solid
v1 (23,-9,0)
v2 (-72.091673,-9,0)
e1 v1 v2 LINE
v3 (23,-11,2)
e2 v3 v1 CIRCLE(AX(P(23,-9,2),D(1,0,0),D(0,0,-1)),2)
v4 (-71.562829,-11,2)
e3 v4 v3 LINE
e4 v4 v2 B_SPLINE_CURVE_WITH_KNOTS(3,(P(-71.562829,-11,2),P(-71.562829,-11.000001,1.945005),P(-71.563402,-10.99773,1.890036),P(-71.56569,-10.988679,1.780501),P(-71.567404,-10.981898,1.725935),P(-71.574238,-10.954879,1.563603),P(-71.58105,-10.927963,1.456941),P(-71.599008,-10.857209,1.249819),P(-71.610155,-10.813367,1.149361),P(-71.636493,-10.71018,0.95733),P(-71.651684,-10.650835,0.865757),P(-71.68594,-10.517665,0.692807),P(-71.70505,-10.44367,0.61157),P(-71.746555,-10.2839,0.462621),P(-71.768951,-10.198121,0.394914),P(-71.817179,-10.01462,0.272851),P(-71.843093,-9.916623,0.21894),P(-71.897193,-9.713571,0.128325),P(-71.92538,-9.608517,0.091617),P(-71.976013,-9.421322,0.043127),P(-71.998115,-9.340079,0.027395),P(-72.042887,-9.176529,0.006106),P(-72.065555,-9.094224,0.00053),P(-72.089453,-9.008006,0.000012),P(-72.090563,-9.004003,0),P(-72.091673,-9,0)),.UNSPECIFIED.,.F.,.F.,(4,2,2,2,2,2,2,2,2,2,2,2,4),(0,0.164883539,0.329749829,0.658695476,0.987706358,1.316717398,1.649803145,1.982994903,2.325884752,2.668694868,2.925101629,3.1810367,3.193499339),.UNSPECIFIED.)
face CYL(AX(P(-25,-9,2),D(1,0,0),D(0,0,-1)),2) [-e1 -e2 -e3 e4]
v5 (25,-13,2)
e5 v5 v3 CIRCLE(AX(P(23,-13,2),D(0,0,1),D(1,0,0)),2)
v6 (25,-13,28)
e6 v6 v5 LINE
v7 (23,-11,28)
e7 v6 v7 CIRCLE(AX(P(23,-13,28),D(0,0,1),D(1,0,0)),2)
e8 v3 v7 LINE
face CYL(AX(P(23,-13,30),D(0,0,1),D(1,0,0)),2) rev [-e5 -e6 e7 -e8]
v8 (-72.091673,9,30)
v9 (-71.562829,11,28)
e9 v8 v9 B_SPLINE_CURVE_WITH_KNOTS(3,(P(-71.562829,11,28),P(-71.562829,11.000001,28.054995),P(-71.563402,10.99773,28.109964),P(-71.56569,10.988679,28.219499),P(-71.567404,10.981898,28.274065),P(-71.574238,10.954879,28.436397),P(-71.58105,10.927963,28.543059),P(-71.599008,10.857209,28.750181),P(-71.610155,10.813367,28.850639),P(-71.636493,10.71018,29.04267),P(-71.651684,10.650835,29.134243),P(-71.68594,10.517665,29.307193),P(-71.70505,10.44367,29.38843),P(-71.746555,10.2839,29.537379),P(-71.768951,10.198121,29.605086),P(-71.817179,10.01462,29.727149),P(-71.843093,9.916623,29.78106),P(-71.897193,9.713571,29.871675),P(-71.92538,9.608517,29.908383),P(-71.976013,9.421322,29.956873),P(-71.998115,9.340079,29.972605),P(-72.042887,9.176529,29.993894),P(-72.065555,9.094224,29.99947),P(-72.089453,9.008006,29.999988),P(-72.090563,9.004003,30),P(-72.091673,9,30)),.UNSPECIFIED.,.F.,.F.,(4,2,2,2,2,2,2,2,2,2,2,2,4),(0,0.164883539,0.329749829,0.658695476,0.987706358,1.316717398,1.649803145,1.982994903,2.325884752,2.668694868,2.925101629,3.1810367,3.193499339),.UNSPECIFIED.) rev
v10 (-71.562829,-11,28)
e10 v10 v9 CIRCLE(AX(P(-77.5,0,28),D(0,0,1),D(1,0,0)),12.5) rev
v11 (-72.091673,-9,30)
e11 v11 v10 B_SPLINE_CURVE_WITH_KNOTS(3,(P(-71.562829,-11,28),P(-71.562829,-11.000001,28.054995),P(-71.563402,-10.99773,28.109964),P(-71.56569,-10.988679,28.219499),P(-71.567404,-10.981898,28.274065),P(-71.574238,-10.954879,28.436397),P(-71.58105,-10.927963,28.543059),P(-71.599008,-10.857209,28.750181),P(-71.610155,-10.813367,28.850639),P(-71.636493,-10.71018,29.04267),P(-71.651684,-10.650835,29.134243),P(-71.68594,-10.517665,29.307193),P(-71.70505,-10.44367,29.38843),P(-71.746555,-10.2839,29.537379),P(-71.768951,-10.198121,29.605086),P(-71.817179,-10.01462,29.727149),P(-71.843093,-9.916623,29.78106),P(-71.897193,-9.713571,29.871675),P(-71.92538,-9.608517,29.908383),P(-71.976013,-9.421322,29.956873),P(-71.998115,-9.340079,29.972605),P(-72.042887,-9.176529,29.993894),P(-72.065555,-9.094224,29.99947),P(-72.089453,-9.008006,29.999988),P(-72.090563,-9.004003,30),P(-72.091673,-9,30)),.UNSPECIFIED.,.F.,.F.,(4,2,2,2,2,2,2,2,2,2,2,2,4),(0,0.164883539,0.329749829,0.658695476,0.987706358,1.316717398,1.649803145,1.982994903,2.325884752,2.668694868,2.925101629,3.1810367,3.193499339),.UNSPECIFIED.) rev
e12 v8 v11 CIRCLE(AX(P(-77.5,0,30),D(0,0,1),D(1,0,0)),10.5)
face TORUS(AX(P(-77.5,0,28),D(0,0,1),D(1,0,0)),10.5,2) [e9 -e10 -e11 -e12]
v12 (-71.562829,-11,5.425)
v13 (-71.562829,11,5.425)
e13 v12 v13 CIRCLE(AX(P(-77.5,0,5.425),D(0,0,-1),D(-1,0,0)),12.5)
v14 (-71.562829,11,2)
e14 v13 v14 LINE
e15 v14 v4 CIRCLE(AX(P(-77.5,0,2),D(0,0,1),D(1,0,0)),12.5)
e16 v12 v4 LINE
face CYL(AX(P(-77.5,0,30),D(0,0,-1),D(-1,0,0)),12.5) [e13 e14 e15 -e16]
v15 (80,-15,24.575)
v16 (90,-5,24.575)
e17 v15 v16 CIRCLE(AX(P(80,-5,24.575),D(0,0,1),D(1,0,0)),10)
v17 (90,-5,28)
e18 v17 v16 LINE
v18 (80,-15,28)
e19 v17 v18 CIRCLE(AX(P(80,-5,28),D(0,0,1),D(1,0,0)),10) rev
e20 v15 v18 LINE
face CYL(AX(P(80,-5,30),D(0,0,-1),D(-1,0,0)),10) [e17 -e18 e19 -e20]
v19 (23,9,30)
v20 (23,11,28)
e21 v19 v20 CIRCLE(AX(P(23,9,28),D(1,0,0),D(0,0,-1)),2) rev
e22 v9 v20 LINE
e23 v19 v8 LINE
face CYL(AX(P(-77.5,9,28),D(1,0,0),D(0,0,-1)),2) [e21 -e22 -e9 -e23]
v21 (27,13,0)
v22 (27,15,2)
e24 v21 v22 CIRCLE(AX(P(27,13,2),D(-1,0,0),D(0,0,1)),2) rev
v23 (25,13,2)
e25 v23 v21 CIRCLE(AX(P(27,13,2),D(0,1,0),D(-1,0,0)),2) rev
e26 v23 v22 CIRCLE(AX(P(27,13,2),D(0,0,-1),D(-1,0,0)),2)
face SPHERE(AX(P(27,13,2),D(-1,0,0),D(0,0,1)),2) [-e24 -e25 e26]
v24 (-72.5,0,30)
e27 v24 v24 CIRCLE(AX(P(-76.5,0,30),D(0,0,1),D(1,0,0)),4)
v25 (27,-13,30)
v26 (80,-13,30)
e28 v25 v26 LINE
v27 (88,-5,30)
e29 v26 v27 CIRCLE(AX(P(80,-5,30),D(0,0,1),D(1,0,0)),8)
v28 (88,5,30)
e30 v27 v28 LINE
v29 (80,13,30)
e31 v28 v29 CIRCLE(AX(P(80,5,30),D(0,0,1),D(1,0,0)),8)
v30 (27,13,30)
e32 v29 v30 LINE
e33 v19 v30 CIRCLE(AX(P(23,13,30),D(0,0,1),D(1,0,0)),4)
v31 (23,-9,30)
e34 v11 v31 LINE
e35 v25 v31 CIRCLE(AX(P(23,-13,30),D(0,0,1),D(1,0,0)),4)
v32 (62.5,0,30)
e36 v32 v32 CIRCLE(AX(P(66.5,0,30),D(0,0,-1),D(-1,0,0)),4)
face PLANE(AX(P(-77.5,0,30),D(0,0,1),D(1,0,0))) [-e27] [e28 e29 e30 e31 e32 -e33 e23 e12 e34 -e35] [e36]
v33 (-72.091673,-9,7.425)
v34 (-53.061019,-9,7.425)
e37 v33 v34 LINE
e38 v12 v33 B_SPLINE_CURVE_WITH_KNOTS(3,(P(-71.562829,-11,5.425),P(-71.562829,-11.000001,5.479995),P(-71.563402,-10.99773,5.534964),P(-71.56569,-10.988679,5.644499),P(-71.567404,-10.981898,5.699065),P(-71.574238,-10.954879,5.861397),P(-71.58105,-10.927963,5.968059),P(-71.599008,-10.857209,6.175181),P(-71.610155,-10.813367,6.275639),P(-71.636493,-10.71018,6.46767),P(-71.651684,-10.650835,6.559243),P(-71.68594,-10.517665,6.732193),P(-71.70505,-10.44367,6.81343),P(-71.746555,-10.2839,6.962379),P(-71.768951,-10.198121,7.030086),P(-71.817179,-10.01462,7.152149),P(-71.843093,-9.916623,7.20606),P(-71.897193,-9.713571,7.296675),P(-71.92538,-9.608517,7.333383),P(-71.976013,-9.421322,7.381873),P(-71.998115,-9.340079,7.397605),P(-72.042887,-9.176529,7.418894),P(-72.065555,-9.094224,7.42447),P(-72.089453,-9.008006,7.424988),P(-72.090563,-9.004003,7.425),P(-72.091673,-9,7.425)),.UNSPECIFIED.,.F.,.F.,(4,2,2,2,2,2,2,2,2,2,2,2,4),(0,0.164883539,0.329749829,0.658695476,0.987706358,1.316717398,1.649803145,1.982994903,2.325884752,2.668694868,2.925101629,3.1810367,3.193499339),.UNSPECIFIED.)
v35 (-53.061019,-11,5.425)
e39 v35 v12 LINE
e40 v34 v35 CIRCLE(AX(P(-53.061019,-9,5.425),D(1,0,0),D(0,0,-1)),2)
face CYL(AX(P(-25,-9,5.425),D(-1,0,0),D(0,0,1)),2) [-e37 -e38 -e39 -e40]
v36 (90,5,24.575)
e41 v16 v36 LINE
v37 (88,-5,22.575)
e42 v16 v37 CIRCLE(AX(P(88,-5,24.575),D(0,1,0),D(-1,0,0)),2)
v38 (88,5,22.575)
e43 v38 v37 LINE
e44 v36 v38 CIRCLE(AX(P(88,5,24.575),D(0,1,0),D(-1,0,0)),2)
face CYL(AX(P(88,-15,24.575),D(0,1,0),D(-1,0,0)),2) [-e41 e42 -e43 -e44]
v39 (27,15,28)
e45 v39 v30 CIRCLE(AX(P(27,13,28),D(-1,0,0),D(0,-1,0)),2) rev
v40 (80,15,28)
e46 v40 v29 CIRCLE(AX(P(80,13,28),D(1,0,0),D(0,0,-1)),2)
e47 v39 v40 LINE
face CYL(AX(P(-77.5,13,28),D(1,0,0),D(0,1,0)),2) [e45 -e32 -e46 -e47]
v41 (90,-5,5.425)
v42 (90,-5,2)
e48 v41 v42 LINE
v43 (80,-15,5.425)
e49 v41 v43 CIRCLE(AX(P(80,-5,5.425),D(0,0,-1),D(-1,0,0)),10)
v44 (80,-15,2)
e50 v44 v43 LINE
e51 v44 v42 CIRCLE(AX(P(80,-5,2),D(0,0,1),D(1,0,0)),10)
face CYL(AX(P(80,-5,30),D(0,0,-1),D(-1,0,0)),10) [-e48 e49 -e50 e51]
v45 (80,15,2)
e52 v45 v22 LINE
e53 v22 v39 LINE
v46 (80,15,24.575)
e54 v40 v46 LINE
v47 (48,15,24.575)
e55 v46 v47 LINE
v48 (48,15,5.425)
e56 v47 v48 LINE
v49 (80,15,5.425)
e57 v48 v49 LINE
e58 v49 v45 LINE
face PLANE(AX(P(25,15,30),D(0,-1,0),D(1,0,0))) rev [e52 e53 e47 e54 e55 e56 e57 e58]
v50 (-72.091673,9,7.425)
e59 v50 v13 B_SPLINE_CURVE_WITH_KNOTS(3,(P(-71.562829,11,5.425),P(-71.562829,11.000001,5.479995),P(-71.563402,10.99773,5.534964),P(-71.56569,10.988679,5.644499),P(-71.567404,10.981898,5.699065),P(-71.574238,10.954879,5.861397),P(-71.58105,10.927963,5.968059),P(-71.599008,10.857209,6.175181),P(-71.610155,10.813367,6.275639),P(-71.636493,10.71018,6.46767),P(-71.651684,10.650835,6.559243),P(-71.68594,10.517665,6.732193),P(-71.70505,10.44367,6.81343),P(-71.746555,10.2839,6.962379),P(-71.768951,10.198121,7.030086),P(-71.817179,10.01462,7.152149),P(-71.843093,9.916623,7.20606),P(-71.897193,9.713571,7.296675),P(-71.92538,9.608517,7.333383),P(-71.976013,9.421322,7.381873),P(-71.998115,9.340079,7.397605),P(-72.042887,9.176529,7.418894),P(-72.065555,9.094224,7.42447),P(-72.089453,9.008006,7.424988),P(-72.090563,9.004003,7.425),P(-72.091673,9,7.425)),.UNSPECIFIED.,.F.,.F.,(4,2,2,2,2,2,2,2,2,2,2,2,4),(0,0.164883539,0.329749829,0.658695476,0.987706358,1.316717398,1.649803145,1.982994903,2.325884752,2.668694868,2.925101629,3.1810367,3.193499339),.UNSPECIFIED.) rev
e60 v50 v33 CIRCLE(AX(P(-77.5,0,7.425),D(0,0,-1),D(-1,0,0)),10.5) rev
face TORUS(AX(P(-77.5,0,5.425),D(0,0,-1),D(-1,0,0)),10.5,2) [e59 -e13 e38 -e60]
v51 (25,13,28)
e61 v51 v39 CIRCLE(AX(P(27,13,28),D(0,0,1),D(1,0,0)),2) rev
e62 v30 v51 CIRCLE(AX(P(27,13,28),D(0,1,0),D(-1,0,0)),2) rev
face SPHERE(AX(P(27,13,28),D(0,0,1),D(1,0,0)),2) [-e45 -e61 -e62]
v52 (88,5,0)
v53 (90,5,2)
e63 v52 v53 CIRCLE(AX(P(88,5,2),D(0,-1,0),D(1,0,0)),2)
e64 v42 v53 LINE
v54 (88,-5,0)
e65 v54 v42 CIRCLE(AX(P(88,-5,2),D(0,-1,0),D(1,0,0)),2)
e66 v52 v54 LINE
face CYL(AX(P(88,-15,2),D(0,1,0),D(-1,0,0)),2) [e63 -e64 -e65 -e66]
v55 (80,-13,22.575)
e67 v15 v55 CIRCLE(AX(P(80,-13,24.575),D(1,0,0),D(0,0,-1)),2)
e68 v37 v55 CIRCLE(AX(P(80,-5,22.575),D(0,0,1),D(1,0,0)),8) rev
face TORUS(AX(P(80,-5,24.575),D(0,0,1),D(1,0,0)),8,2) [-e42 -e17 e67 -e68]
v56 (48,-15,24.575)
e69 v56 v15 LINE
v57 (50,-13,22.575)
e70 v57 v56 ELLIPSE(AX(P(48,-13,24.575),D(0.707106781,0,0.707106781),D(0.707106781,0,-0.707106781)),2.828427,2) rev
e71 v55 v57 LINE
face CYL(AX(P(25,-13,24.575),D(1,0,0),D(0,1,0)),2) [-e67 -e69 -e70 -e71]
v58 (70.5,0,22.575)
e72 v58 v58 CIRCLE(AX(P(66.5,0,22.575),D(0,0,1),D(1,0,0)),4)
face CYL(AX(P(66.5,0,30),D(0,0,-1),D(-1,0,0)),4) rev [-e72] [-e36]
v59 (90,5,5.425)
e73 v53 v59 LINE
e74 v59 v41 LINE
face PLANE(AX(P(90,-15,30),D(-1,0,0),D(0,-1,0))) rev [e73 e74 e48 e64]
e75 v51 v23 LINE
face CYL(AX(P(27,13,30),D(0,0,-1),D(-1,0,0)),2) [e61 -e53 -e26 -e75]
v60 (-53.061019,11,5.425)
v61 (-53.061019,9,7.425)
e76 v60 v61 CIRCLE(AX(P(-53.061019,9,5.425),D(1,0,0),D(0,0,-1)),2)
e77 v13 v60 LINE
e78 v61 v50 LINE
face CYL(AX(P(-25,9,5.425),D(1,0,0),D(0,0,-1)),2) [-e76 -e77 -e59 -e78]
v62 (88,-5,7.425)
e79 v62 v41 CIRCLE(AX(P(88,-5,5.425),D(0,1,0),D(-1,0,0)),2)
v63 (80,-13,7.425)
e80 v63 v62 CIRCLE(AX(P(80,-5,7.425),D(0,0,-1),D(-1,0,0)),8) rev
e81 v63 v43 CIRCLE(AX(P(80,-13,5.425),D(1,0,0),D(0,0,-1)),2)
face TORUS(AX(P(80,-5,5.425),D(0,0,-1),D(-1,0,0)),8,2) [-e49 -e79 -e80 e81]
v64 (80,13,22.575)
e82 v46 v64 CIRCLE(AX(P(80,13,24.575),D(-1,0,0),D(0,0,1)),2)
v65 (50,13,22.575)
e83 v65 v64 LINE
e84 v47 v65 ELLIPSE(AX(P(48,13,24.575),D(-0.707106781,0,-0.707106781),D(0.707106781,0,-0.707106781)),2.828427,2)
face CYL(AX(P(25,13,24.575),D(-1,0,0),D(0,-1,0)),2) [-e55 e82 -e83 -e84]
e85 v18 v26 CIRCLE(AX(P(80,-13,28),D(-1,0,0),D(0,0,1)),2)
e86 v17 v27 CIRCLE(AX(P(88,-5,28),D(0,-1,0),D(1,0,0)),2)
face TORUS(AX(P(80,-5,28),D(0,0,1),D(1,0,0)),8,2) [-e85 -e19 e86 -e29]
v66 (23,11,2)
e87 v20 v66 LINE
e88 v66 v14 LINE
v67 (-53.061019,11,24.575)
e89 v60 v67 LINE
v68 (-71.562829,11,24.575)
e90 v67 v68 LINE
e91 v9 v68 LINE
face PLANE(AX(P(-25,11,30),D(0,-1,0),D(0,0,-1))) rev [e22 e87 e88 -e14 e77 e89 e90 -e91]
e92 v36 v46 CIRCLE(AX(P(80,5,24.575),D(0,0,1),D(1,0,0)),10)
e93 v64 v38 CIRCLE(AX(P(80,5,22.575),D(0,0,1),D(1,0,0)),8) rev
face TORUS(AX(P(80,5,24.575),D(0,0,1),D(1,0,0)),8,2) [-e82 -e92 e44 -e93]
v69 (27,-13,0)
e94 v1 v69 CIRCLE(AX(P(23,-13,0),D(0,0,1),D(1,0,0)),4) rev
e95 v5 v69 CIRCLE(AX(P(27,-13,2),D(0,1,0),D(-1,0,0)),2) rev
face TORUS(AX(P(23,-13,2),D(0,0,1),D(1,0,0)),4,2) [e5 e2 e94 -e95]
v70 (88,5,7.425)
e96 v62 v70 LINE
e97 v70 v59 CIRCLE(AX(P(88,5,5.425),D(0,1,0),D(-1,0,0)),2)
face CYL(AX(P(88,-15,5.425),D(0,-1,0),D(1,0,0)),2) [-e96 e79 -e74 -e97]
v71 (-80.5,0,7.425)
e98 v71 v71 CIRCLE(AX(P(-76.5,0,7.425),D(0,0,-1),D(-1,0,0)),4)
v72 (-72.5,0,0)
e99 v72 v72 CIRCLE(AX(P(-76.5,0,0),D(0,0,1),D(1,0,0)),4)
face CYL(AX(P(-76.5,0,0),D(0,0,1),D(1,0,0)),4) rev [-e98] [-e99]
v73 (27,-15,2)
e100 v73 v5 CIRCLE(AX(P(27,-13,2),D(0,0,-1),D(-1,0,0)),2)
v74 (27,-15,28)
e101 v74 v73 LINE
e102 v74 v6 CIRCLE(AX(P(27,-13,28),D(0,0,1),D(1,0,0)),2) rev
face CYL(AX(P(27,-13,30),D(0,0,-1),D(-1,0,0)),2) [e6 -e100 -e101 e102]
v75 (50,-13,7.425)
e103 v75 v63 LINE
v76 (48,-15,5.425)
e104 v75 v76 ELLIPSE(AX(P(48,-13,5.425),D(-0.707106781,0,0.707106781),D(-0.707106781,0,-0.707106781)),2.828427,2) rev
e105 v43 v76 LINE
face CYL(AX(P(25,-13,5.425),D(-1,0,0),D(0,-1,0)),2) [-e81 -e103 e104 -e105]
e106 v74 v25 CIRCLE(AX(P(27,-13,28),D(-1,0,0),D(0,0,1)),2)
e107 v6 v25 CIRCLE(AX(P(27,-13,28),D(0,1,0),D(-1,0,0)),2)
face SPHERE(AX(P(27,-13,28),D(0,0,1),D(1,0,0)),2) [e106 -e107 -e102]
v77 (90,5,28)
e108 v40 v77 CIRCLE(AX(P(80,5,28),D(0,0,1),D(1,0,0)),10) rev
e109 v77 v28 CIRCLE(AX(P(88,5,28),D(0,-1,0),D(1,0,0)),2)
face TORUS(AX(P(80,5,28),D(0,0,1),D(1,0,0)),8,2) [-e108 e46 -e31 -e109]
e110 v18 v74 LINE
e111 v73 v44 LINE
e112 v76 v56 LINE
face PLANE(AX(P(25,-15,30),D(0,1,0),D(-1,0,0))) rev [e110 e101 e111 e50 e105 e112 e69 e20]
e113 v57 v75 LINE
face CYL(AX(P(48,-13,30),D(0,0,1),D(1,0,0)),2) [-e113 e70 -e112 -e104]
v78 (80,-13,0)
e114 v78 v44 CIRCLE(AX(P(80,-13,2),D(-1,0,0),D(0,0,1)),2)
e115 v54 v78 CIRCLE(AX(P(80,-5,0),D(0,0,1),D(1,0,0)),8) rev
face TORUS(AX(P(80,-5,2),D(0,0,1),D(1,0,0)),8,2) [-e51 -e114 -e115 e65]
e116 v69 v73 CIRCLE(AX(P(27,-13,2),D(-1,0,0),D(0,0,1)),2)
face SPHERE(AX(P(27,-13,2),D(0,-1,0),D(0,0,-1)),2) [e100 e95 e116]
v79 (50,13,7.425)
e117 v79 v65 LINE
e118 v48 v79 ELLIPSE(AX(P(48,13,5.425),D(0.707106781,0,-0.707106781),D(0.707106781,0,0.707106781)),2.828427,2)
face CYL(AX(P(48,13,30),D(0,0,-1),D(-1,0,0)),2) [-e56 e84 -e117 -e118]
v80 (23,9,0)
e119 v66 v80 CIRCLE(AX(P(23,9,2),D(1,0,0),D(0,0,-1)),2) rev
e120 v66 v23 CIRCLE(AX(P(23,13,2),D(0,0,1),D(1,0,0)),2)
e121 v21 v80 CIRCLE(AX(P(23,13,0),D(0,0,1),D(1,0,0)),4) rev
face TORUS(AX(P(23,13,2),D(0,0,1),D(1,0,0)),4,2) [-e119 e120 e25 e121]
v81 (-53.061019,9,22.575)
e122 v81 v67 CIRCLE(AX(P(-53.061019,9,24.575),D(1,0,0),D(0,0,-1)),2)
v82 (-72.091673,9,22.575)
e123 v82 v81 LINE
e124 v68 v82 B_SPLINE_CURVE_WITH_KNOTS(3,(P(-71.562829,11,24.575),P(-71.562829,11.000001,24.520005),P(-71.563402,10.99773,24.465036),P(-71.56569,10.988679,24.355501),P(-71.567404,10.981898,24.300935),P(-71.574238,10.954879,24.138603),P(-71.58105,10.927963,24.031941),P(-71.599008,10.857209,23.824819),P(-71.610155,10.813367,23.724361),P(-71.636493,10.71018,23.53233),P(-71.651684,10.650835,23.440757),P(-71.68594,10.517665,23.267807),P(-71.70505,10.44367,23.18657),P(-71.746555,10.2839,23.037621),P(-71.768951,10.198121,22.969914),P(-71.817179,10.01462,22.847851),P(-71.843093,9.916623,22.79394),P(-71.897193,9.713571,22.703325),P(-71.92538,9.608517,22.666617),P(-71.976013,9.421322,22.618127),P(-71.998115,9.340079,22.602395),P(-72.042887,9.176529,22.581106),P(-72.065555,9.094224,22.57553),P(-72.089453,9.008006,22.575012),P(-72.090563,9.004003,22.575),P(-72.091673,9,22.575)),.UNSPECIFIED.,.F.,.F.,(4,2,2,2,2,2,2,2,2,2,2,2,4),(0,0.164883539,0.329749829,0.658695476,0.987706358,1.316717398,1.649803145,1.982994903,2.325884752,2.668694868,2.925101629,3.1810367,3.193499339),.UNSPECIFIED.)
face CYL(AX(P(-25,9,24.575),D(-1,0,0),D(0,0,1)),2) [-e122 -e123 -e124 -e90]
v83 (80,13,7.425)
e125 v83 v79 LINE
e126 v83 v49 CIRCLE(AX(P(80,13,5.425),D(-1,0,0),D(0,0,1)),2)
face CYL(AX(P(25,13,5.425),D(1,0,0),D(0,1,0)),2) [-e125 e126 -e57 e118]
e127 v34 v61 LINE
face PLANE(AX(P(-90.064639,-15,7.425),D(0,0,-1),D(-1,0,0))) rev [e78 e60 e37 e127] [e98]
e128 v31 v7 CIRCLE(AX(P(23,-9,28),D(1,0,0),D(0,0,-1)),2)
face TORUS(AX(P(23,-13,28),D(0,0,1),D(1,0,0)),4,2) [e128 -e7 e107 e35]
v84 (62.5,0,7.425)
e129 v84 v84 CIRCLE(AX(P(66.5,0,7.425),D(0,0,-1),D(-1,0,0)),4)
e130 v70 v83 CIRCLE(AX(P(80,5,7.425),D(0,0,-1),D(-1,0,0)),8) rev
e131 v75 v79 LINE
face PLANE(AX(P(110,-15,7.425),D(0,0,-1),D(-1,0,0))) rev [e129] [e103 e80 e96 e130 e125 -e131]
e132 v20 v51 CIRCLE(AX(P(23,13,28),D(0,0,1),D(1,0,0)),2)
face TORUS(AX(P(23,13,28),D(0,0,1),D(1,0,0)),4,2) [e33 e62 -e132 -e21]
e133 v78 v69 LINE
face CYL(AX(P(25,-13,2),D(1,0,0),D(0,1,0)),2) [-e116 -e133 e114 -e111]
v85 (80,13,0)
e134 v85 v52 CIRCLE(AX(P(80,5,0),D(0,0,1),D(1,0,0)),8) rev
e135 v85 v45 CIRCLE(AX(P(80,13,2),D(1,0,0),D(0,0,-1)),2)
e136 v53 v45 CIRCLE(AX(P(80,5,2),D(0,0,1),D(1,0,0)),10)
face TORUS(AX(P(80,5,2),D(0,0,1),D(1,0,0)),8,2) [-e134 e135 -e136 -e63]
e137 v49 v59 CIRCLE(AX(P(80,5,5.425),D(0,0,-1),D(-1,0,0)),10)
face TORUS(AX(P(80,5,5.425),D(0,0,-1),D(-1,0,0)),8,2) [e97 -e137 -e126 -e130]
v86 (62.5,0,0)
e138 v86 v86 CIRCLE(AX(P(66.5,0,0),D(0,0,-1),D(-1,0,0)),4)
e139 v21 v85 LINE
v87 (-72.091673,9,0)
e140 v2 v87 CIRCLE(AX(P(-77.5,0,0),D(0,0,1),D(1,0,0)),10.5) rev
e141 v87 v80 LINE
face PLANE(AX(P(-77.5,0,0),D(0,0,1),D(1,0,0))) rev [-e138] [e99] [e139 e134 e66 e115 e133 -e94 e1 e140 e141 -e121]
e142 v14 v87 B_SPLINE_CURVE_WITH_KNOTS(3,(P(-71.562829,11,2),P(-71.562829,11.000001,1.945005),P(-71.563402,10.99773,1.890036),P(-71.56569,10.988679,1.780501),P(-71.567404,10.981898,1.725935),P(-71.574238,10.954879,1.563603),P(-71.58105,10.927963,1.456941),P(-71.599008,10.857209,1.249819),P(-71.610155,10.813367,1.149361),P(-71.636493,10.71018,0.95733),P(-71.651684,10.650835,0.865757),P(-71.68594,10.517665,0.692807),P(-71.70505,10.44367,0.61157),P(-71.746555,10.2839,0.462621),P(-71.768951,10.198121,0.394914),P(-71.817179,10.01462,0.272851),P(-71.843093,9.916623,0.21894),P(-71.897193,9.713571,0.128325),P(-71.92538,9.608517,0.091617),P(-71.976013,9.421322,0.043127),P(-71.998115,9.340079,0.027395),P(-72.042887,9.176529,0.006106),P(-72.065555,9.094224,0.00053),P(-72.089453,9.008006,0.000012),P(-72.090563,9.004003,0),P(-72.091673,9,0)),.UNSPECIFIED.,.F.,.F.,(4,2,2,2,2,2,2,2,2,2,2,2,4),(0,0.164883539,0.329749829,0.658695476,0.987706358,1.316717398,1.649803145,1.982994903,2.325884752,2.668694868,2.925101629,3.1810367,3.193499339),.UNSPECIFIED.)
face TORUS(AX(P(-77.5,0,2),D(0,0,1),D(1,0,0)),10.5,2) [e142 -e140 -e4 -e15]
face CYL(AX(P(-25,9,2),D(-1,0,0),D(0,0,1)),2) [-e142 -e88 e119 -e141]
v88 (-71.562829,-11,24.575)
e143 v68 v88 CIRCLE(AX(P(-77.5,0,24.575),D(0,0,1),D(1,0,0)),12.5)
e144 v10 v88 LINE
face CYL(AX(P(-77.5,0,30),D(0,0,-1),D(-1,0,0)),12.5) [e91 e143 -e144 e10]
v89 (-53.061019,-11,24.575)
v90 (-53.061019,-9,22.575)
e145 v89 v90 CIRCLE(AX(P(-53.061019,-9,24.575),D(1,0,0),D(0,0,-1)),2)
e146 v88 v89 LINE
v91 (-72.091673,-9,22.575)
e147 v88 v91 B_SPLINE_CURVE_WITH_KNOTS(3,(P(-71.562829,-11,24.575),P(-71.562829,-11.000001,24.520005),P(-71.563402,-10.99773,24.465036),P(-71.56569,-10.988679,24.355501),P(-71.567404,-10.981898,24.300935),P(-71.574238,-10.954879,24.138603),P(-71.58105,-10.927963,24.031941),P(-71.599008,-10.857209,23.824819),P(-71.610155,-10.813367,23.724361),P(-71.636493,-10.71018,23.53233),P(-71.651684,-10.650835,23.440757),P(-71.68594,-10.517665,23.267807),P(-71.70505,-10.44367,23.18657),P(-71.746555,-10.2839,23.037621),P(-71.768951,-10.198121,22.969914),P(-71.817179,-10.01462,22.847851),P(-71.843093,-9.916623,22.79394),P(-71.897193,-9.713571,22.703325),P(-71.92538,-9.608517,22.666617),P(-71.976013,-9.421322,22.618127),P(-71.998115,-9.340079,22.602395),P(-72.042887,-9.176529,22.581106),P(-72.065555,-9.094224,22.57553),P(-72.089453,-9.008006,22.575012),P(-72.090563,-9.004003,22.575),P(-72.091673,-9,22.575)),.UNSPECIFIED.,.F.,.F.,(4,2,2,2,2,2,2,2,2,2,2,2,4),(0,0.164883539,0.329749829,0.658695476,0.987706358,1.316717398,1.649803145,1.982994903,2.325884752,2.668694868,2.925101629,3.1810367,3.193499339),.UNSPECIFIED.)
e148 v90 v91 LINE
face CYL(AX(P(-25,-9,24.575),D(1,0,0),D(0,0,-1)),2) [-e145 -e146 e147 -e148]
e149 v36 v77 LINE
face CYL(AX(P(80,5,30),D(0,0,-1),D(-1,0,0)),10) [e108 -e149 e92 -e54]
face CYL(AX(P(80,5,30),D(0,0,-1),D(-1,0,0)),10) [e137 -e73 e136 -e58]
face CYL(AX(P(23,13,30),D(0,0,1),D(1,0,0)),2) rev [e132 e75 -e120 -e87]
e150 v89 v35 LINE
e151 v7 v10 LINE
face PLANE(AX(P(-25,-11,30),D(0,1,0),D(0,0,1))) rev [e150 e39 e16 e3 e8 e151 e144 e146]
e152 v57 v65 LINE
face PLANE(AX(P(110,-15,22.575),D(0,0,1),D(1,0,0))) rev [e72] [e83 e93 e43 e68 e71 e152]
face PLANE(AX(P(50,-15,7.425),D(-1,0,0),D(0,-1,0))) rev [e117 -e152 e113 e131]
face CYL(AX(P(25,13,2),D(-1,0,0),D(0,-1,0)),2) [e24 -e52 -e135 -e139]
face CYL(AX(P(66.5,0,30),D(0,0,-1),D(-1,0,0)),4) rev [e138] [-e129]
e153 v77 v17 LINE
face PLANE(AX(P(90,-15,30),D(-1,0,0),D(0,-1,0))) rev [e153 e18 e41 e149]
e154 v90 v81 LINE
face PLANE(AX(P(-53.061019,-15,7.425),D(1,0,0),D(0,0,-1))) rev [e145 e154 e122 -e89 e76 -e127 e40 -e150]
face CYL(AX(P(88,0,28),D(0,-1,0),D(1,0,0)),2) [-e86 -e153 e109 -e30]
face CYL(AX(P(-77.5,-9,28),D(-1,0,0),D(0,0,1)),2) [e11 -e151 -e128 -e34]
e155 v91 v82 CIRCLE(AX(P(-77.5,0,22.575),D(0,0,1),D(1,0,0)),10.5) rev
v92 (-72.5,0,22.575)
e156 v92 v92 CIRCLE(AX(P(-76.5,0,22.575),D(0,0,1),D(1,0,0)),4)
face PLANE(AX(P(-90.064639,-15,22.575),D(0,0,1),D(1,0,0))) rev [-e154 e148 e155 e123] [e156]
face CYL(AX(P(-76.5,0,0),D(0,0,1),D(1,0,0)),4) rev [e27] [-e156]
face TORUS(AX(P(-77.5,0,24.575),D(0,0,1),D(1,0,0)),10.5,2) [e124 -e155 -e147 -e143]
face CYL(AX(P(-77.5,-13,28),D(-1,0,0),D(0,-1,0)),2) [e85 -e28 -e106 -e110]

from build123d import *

# Parameters (mm, degrees)
SALIENTE_EXTRUIR1_DEPTH    = 30
REDONDEO1_R                = 10
CORTAR_EXTRUIR1_DEPTH      = 99.3666610188635
CORTAR_EXTRUIR1_DEPTH_BACK = 99.3666610188635
CROQUIS2_W                 = 37.00361962237292
CROQUIS2_H                 = 15.150000000000002
CROQUIS3_R                 = 4.000000000000006
CORTAR_EXTRUIR2_DEPTH      = 97.04686356149273
CORTAR_EXTRUIR3_DEPTH      = 100.498743710662
CORTAR_EXTRUIR3_DEPTH_BACK = 100.498743710662
CROQUIS5_R                 = 4.000000000000006
CORTAR_EXTRUIR4_DEPTH      = 97.04686356149273
REDONDEO2_R                = 2


with BuildPart() as part:
    # Croquis1 → Saliente-Extruir1 (new body)
    with BuildSketch(Plane.XY):
        with BuildLine():
            Line((89.99999999999999, -14.999999999999972), (90, 15.000000000000014))
            Line((90, 15.000000000000014), (25, 15.000000000000007))
            Line((25, 15.000000000000007), (25.000000000000004, 11))
            Line((25.000000000000004, 11), (-24.999999999999996, 11))
            Line((-24.999999999999996, 11), (-71.56282895648103, 11))
            ThreePointArc((-71.56282895648103, 11), (-90, 1.53e-15), (-71.56282895648103, -11))
            Line((-71.56282895648103, -11), (-24.999999999999996, -11))
            Line((-24.999999999999996, -11), (25.000000000000004, -11))
            Line((25.000000000000004, -11), (24.999999999999993, -14.999999999999982))
            Line((24.999999999999993, -14.999999999999982), (89.99999999999999, -14.999999999999972))
        make_face()
    extrude(amount=SALIENTE_EXTRUIR1_DEPTH)

    # Redondeo1
    redondeo1_edges = [part.edges().sort_by_distance(p)[0] for p in [
        (90, 15.000000000000014, 15),
        (89.99999999999999, -14.999999999999972, 15),
    ]]
    fillet(redondeo1_edges, radius=REDONDEO1_R)

    # Croquis2 → Cortar-Extruir1 (cut, two sides: drawn at the far end of the back side and taken through both)
    with BuildSketch(Plane(origin=(0, 11, 0), x_dir=(1, 0, 0), z_dir=(0, 1, 0)).offset(-CORTAR_EXTRUIR1_DEPTH_BACK)):
        with Locations((-71.56282895648103, -14.999999999999998)):
            Rectangle(CROQUIS2_W, CROQUIS2_H)
    extrude(amount=CORTAR_EXTRUIR1_DEPTH + CORTAR_EXTRUIR1_DEPTH_BACK, mode=Mode.SUBTRACT)

    # Croquis3 → Cortar-Extruir2 (cut, through all)
    with BuildSketch(Plane.XY.offset(30)):
        with Locations((-76.50000000000001, 0)):
            Circle(CROQUIS3_R)
    extrude(amount=-CORTAR_EXTRUIR2_DEPTH, mode=Mode.SUBTRACT)

    # Croquis4 → Cortar-Extruir3 (cut, two sides: drawn at the far end of the back side and taken through both)
    with BuildSketch(Plane(origin=(-2e-15, 15.000000000000004, 0), x_dir=(1, 1.3e-16, 0), z_dir=(-1.3e-16, 1, 0)).offset(-CORTAR_EXTRUIR3_DEPTH_BACK)):
        Polygon((109.99999999999997, -7.424999999999999), (49.99999999999999, -7.424999999999999), (49.99999999999999, -22.575), (109.99999999999997, -22.575000000000003), align=None)
    extrude(amount=CORTAR_EXTRUIR3_DEPTH + CORTAR_EXTRUIR3_DEPTH_BACK, mode=Mode.SUBTRACT)

    # Croquis5 → Cortar-Extruir4 (cut, through all)
    with BuildSketch(Plane(origin=(0, 0, 0), x_dir=(-1, 0, 0), z_dir=(0, 0, -1))):
        with Locations((-66.49999999999999, 0)):
            Circle(CROQUIS5_R)
    extrude(amount=-CORTAR_EXTRUIR4_DEPTH, mode=Mode.SUBTRACT)

    # Redondeo2
    redondeo2_edges = [part.edges().sort_by_distance(p)[0] for p in [
        (25.000000000000004, -11, 15),
        (25.000000000000004, 11, 15),
    ]]
    fillet(redondeo2_edges, radius=REDONDEO2_R)
    redondeo2_2_edges = [part.edges().sort_by_distance(p)[0] for p in [
        (52.499999999999986, -14.999999999999977, 0),
        (87.07106781186545, -12.071067811865449, 0),
        (89.99999999999999, 1.421e-14, 0),
        (87.07106781186548, 12.07106781186549, 0),
        (65, 15.00000000000001, 7.424999999999999),
        (87.07106781186548, 12.071067811865488, 7.424999999999999),
        (90, 1.421e-14, 7.424999999999999),
        (87.07106781186545, -12.071067811865456, 7.424999999999999),
        (64.99999999999999, -14.999999999999973, 22.574999999999996),
        (87.07106781186545, -12.071067811865456, 22.575),
        (90, 1.421e-14, 22.575000000000003),
        (87.07106781186548, 12.071067811865488, 22.575),
        (52.5, 15.00000000000001, 30),
        (87.07106781186548, 12.07106781186549, 30),
        (89.99999999999999, 1.421e-14, 30),
        (87.07106781186545, -12.071067811865449, 30),
        (-24.28141447824052, -11, 0),
        (-90, -2.22e-15, 0),
        (-24.28141447824051, 11, 0),
        (52.5, 15.00000000000001, 0),
        (64.99999999999999, -14.999999999999975, 7.424999999999999),
        (50, -14.999999999999977, 15),
        (49.99999999999999, 15.00000000000001, 15),
        (65, 15.00000000000001, 22.575000000000003),
        (-90, -2.22e-15, 30),
        (-24.281414478240514, 11, 30),
        (52.499999999999986, -14.999999999999977, 30),
        (-24.281414478240517, -11, 30),
        (24.999999999999993, -14.999999999999982, 15),
        (25, 15.000000000000007, 15),
        (-90, 4.88e-15, 7.424999999999997),
        (-62.3119240508878, 11, 7.424999999999997),
        (-62.3119240508878, -11, 7.424999999999997),
        (-62.3119240508878, -11, 22.575),
        (-90, 4.88e-15, 22.575),
        (-62.3119240508878, 11, 22.575),
        (24.41421356237309, -11.585786437626908, 30),
        (24.4142135623731, 11.585786437626904, 30),
        (24.4142135623731, 11.585786437626906, 0),
        (24.41421356237309, -11.585786437626906, 0),
    ]]
    fillet(redondeo2_2_edges, radius=REDONDEO2_R - 0.0001)  # a hair under: the kernel refuses the full size


solid = part.part
